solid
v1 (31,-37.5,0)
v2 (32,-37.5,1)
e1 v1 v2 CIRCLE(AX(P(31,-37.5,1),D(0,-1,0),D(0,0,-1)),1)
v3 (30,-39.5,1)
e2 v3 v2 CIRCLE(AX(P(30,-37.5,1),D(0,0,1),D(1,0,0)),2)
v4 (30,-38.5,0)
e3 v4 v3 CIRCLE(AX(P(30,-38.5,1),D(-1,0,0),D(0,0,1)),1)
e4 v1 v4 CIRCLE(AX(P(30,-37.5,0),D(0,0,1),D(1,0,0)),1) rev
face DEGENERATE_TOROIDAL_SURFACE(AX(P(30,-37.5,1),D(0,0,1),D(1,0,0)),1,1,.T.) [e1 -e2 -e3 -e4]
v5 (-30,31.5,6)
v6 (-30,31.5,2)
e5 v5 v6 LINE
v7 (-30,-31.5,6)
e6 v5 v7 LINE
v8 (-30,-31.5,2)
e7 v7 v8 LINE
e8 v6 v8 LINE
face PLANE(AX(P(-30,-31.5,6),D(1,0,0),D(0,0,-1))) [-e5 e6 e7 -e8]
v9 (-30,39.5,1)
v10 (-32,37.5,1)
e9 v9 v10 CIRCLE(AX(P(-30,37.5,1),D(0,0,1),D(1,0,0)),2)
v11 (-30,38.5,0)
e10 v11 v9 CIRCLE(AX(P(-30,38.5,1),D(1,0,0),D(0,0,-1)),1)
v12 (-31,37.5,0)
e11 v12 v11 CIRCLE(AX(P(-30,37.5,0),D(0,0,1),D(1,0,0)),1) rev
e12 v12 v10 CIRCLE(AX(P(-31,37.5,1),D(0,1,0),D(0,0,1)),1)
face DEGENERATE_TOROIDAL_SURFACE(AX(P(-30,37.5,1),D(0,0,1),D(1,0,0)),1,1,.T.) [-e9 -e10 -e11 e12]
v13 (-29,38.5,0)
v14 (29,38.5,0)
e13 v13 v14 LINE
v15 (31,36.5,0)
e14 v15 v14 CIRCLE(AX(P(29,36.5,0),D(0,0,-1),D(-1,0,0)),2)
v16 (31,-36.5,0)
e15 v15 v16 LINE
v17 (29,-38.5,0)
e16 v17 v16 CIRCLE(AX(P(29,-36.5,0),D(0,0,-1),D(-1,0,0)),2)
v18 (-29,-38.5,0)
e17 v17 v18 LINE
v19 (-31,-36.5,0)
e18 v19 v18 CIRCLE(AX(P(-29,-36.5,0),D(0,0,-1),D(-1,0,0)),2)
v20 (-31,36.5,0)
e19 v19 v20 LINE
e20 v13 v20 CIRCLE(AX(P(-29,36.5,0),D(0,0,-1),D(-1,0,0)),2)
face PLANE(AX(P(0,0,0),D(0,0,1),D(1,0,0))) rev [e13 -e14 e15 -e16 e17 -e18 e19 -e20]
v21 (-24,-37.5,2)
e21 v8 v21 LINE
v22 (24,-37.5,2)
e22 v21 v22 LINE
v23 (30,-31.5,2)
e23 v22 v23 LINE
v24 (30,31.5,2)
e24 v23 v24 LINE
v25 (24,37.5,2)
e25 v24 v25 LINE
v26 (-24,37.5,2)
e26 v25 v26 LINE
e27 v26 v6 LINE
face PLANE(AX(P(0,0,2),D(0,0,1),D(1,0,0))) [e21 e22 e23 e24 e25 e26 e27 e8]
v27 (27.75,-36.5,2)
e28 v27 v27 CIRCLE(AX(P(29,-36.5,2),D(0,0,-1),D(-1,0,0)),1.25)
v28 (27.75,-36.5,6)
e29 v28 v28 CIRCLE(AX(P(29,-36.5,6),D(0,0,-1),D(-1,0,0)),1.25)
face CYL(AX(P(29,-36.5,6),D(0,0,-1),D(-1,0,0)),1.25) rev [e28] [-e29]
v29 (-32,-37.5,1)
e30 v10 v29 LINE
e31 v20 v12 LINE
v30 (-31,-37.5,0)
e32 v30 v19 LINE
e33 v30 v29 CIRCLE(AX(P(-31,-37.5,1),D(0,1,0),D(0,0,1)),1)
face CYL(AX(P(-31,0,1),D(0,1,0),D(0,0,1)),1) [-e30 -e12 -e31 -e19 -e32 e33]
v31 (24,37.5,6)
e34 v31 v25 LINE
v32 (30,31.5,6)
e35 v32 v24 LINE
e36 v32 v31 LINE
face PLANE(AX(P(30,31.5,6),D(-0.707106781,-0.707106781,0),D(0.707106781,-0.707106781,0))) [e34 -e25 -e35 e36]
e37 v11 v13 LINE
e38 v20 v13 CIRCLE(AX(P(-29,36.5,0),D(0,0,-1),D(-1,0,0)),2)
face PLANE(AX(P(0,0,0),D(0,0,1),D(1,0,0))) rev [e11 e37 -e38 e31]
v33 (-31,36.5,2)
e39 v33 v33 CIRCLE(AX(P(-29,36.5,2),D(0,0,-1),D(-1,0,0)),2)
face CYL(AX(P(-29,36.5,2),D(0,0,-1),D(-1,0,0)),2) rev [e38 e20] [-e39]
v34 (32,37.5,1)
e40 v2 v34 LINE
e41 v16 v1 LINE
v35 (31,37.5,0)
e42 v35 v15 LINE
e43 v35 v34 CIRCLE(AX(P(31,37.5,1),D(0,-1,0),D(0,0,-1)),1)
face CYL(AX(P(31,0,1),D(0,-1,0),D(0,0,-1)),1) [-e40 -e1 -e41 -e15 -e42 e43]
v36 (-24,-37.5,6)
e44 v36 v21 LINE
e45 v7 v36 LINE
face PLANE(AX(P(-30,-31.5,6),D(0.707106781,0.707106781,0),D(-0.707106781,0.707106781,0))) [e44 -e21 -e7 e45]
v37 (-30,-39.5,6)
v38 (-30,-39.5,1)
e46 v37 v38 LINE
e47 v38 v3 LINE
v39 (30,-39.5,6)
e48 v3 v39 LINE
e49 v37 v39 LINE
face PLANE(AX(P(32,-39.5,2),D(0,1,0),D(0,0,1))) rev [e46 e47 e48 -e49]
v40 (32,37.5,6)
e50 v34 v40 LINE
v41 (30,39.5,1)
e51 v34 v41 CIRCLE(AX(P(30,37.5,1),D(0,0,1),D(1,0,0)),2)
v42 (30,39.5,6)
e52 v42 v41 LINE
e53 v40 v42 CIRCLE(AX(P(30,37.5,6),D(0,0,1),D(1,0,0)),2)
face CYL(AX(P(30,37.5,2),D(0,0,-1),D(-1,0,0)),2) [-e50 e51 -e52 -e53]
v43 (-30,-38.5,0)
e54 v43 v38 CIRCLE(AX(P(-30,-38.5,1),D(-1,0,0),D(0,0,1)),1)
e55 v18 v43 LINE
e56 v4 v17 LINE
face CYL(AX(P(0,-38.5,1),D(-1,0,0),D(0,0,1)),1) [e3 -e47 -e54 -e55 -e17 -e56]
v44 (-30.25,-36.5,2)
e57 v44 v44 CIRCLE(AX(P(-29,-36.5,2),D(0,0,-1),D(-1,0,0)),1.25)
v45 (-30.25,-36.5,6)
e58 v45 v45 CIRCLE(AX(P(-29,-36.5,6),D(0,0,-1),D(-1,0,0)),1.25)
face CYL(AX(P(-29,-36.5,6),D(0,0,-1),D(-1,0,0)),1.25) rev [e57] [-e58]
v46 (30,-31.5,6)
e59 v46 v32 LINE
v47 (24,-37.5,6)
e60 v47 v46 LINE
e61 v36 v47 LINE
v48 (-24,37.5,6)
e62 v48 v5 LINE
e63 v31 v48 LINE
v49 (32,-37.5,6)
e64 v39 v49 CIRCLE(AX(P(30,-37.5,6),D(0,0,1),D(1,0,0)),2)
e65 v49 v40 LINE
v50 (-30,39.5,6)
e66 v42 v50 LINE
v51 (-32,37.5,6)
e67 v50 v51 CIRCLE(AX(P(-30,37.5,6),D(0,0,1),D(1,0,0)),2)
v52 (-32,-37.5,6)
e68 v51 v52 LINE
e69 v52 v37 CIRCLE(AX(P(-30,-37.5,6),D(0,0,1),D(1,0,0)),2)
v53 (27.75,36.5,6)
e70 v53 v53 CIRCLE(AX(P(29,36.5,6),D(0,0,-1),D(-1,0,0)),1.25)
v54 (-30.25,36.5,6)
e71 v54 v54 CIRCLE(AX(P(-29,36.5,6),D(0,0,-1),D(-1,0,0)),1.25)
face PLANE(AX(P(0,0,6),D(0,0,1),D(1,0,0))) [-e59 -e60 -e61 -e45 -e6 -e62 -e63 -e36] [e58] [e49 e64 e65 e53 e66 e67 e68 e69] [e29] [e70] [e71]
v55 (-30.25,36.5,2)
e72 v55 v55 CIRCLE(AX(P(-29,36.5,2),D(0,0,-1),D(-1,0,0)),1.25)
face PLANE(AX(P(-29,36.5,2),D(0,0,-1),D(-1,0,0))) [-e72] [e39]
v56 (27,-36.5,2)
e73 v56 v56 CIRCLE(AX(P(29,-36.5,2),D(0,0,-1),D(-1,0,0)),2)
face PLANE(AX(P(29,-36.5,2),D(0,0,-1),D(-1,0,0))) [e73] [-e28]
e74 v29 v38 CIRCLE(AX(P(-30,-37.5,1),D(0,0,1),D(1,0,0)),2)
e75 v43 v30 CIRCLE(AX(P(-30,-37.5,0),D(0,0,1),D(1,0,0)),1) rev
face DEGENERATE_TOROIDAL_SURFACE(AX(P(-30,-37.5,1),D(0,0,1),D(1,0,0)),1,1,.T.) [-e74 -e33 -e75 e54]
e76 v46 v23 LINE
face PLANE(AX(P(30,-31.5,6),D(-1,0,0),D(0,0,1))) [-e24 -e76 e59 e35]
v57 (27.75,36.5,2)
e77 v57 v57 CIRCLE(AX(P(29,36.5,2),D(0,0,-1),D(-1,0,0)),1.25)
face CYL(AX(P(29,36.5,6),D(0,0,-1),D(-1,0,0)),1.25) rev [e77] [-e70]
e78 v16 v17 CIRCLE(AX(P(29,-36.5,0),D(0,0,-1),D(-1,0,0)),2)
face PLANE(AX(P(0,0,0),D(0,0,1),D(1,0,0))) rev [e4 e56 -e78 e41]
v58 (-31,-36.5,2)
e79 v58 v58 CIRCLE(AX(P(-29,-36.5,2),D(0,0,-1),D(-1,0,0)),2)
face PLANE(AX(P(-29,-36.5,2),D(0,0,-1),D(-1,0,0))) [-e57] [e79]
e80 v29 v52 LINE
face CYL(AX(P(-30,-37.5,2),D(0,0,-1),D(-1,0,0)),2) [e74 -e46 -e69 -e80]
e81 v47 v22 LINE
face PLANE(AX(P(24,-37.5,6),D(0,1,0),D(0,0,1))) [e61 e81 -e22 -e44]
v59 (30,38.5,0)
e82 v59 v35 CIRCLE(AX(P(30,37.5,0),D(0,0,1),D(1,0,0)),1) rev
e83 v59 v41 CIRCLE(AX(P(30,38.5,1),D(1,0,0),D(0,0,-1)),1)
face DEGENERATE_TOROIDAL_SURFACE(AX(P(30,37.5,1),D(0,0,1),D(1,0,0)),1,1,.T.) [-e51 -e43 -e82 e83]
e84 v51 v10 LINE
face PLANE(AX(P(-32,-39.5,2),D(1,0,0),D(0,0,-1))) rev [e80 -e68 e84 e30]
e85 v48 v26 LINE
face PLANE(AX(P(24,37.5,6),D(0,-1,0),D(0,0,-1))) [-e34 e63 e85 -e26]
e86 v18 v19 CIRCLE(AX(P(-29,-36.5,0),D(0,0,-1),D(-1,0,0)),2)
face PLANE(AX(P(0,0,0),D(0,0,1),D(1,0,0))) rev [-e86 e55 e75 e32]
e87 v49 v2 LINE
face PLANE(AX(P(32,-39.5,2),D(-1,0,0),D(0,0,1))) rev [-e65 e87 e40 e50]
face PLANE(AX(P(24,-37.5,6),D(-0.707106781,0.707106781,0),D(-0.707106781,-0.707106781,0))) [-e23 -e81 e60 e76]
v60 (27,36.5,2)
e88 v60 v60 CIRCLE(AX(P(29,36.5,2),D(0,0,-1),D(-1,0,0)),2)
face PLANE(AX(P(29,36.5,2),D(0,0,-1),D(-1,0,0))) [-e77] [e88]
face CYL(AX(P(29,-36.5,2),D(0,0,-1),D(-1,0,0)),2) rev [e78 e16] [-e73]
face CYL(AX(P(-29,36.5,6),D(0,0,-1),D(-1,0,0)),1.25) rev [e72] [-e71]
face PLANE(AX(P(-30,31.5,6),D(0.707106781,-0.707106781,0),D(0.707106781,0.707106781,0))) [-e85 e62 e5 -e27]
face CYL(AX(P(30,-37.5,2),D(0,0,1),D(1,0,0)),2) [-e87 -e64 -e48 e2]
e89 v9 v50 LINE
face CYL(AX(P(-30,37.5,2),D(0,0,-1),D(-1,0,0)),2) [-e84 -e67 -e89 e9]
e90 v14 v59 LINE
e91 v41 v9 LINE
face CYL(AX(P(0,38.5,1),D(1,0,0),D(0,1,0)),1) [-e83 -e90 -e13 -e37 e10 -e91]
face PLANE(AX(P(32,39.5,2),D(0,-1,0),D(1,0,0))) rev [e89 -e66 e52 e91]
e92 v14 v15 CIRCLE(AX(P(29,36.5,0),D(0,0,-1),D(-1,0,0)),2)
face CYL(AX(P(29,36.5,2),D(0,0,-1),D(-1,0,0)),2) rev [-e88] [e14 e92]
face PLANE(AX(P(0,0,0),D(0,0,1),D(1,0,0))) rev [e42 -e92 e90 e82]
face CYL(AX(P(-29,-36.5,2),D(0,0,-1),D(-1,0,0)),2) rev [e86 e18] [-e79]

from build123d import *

# Parameters (mm, degrees)
SKETCH1_W           = 64
SKETCH1_H           = 79
BOSS_EXTRUDE1_DEPTH = 2
SKETCH2_W           = 64
SKETCH2_H           = 79
BOSS_EXTRUDE6_DEPTH = 4
FILLET1_R           = 2
FILLET2_R           = 2
FILLET3_R           = 2
FILLET4_R           = 2
SKETCH4_R           = 2
CUT_EXTRUDE1_DEPTH  = 2
SKETCH6_R           = 1.25
CUT_EXTRUDE2_DEPTH  = 4
FILLET5_R           = 1


with BuildPart() as part:
    # Sketch1 → Boss-Extrude1 (new body)
    with BuildSketch(Plane.XY):
        Rectangle(SKETCH1_W, SKETCH1_H)
    extrude(amount=BOSS_EXTRUDE1_DEPTH)

    # Sketch2 → Boss-Extrude6 (add)
    with BuildSketch(Plane.XY.offset(2)):
        Rectangle(SKETCH2_W, SKETCH2_H)
        Polygon((-30, 31.5), (-24, 37.5), (24, 37.5), (30, 31.5), (30, -31.5), (24, -37.5), (-24, -37.5), (-30, -31.5), align=None, mode=Mode.SUBTRACT)
    extrude(amount=BOSS_EXTRUDE6_DEPTH)

    # Fillet1
    fillet1_edges = [part.edges().sort_by_distance(p)[0] for p in [
        (-32, -39.5, 3),
    ]]
    fillet(fillet1_edges, radius=FILLET1_R)

    # Fillet2
    fillet2_edges = [part.edges().sort_by_distance(p)[0] for p in [
        (32, -39.5, 3),
    ]]
    fillet(fillet2_edges, radius=FILLET2_R)

    # Fillet3
    fillet3_edges = [part.edges().sort_by_distance(p)[0] for p in [
        (32, 39.5, 3),
    ]]
    fillet(fillet3_edges, radius=FILLET3_R)

    # Fillet4
    fillet4_edges = [part.edges().sort_by_distance(p)[0] for p in [
        (-32, 39.5, 3),
    ]]
    fillet(fillet4_edges, radius=FILLET4_R)

    # Sketch4 → Cut-Extrude1 (cut)
    with BuildSketch(Plane(origin=(0, 0, 0), x_dir=(-1, 0, 0), z_dir=(0, 0, -1))):
        with Locations((29, 36.5)):
            Circle(SKETCH4_R)
        with Locations((29, -36.5)):
            Circle(SKETCH4_R)
        with Locations((-29, -36.5)):
            Circle(SKETCH4_R)
        with Locations((-29, 36.5)):
            Circle(SKETCH4_R)
    extrude(amount=-CUT_EXTRUDE1_DEPTH, mode=Mode.SUBTRACT)

    # Sketch6 → Cut-Extrude2 (cut)
    with BuildSketch(Plane(origin=(0, 0, 2), x_dir=(-1, 0, 0), z_dir=(0, 0, -1))):
        with Locations((29, 36.5)):
            Circle(SKETCH6_R)
        with Locations((29, -36.5)):
            Circle(SKETCH6_R)
        with Locations((-29, -36.5)):
            Circle(SKETCH6_R)
        with Locations((-29, 36.5)):
            Circle(SKETCH6_R)
    extrude(amount=-CUT_EXTRUDE2_DEPTH, mode=Mode.SUBTRACT)

    # Fillet5
    fillet5_edges = [part.edges().sort_by_distance(p)[0] for p in [
        (0, -39.5, 0),
        (-31.414213562, -38.914213562, 0),
        (32, 0, 0),
        (31.414213562, -38.914213562, 0),
        (0, 39.5, 0),
        (31.414213562, 38.914213562, 0),
        (-32, 0, 0),
        (-31.414213562, 38.914213562, 0),
    ]]
    fillet(fillet5_edges, radius=FILLET5_R - 0.0001)  # a hair under: the kernel refuses the full size


solid = part.part
